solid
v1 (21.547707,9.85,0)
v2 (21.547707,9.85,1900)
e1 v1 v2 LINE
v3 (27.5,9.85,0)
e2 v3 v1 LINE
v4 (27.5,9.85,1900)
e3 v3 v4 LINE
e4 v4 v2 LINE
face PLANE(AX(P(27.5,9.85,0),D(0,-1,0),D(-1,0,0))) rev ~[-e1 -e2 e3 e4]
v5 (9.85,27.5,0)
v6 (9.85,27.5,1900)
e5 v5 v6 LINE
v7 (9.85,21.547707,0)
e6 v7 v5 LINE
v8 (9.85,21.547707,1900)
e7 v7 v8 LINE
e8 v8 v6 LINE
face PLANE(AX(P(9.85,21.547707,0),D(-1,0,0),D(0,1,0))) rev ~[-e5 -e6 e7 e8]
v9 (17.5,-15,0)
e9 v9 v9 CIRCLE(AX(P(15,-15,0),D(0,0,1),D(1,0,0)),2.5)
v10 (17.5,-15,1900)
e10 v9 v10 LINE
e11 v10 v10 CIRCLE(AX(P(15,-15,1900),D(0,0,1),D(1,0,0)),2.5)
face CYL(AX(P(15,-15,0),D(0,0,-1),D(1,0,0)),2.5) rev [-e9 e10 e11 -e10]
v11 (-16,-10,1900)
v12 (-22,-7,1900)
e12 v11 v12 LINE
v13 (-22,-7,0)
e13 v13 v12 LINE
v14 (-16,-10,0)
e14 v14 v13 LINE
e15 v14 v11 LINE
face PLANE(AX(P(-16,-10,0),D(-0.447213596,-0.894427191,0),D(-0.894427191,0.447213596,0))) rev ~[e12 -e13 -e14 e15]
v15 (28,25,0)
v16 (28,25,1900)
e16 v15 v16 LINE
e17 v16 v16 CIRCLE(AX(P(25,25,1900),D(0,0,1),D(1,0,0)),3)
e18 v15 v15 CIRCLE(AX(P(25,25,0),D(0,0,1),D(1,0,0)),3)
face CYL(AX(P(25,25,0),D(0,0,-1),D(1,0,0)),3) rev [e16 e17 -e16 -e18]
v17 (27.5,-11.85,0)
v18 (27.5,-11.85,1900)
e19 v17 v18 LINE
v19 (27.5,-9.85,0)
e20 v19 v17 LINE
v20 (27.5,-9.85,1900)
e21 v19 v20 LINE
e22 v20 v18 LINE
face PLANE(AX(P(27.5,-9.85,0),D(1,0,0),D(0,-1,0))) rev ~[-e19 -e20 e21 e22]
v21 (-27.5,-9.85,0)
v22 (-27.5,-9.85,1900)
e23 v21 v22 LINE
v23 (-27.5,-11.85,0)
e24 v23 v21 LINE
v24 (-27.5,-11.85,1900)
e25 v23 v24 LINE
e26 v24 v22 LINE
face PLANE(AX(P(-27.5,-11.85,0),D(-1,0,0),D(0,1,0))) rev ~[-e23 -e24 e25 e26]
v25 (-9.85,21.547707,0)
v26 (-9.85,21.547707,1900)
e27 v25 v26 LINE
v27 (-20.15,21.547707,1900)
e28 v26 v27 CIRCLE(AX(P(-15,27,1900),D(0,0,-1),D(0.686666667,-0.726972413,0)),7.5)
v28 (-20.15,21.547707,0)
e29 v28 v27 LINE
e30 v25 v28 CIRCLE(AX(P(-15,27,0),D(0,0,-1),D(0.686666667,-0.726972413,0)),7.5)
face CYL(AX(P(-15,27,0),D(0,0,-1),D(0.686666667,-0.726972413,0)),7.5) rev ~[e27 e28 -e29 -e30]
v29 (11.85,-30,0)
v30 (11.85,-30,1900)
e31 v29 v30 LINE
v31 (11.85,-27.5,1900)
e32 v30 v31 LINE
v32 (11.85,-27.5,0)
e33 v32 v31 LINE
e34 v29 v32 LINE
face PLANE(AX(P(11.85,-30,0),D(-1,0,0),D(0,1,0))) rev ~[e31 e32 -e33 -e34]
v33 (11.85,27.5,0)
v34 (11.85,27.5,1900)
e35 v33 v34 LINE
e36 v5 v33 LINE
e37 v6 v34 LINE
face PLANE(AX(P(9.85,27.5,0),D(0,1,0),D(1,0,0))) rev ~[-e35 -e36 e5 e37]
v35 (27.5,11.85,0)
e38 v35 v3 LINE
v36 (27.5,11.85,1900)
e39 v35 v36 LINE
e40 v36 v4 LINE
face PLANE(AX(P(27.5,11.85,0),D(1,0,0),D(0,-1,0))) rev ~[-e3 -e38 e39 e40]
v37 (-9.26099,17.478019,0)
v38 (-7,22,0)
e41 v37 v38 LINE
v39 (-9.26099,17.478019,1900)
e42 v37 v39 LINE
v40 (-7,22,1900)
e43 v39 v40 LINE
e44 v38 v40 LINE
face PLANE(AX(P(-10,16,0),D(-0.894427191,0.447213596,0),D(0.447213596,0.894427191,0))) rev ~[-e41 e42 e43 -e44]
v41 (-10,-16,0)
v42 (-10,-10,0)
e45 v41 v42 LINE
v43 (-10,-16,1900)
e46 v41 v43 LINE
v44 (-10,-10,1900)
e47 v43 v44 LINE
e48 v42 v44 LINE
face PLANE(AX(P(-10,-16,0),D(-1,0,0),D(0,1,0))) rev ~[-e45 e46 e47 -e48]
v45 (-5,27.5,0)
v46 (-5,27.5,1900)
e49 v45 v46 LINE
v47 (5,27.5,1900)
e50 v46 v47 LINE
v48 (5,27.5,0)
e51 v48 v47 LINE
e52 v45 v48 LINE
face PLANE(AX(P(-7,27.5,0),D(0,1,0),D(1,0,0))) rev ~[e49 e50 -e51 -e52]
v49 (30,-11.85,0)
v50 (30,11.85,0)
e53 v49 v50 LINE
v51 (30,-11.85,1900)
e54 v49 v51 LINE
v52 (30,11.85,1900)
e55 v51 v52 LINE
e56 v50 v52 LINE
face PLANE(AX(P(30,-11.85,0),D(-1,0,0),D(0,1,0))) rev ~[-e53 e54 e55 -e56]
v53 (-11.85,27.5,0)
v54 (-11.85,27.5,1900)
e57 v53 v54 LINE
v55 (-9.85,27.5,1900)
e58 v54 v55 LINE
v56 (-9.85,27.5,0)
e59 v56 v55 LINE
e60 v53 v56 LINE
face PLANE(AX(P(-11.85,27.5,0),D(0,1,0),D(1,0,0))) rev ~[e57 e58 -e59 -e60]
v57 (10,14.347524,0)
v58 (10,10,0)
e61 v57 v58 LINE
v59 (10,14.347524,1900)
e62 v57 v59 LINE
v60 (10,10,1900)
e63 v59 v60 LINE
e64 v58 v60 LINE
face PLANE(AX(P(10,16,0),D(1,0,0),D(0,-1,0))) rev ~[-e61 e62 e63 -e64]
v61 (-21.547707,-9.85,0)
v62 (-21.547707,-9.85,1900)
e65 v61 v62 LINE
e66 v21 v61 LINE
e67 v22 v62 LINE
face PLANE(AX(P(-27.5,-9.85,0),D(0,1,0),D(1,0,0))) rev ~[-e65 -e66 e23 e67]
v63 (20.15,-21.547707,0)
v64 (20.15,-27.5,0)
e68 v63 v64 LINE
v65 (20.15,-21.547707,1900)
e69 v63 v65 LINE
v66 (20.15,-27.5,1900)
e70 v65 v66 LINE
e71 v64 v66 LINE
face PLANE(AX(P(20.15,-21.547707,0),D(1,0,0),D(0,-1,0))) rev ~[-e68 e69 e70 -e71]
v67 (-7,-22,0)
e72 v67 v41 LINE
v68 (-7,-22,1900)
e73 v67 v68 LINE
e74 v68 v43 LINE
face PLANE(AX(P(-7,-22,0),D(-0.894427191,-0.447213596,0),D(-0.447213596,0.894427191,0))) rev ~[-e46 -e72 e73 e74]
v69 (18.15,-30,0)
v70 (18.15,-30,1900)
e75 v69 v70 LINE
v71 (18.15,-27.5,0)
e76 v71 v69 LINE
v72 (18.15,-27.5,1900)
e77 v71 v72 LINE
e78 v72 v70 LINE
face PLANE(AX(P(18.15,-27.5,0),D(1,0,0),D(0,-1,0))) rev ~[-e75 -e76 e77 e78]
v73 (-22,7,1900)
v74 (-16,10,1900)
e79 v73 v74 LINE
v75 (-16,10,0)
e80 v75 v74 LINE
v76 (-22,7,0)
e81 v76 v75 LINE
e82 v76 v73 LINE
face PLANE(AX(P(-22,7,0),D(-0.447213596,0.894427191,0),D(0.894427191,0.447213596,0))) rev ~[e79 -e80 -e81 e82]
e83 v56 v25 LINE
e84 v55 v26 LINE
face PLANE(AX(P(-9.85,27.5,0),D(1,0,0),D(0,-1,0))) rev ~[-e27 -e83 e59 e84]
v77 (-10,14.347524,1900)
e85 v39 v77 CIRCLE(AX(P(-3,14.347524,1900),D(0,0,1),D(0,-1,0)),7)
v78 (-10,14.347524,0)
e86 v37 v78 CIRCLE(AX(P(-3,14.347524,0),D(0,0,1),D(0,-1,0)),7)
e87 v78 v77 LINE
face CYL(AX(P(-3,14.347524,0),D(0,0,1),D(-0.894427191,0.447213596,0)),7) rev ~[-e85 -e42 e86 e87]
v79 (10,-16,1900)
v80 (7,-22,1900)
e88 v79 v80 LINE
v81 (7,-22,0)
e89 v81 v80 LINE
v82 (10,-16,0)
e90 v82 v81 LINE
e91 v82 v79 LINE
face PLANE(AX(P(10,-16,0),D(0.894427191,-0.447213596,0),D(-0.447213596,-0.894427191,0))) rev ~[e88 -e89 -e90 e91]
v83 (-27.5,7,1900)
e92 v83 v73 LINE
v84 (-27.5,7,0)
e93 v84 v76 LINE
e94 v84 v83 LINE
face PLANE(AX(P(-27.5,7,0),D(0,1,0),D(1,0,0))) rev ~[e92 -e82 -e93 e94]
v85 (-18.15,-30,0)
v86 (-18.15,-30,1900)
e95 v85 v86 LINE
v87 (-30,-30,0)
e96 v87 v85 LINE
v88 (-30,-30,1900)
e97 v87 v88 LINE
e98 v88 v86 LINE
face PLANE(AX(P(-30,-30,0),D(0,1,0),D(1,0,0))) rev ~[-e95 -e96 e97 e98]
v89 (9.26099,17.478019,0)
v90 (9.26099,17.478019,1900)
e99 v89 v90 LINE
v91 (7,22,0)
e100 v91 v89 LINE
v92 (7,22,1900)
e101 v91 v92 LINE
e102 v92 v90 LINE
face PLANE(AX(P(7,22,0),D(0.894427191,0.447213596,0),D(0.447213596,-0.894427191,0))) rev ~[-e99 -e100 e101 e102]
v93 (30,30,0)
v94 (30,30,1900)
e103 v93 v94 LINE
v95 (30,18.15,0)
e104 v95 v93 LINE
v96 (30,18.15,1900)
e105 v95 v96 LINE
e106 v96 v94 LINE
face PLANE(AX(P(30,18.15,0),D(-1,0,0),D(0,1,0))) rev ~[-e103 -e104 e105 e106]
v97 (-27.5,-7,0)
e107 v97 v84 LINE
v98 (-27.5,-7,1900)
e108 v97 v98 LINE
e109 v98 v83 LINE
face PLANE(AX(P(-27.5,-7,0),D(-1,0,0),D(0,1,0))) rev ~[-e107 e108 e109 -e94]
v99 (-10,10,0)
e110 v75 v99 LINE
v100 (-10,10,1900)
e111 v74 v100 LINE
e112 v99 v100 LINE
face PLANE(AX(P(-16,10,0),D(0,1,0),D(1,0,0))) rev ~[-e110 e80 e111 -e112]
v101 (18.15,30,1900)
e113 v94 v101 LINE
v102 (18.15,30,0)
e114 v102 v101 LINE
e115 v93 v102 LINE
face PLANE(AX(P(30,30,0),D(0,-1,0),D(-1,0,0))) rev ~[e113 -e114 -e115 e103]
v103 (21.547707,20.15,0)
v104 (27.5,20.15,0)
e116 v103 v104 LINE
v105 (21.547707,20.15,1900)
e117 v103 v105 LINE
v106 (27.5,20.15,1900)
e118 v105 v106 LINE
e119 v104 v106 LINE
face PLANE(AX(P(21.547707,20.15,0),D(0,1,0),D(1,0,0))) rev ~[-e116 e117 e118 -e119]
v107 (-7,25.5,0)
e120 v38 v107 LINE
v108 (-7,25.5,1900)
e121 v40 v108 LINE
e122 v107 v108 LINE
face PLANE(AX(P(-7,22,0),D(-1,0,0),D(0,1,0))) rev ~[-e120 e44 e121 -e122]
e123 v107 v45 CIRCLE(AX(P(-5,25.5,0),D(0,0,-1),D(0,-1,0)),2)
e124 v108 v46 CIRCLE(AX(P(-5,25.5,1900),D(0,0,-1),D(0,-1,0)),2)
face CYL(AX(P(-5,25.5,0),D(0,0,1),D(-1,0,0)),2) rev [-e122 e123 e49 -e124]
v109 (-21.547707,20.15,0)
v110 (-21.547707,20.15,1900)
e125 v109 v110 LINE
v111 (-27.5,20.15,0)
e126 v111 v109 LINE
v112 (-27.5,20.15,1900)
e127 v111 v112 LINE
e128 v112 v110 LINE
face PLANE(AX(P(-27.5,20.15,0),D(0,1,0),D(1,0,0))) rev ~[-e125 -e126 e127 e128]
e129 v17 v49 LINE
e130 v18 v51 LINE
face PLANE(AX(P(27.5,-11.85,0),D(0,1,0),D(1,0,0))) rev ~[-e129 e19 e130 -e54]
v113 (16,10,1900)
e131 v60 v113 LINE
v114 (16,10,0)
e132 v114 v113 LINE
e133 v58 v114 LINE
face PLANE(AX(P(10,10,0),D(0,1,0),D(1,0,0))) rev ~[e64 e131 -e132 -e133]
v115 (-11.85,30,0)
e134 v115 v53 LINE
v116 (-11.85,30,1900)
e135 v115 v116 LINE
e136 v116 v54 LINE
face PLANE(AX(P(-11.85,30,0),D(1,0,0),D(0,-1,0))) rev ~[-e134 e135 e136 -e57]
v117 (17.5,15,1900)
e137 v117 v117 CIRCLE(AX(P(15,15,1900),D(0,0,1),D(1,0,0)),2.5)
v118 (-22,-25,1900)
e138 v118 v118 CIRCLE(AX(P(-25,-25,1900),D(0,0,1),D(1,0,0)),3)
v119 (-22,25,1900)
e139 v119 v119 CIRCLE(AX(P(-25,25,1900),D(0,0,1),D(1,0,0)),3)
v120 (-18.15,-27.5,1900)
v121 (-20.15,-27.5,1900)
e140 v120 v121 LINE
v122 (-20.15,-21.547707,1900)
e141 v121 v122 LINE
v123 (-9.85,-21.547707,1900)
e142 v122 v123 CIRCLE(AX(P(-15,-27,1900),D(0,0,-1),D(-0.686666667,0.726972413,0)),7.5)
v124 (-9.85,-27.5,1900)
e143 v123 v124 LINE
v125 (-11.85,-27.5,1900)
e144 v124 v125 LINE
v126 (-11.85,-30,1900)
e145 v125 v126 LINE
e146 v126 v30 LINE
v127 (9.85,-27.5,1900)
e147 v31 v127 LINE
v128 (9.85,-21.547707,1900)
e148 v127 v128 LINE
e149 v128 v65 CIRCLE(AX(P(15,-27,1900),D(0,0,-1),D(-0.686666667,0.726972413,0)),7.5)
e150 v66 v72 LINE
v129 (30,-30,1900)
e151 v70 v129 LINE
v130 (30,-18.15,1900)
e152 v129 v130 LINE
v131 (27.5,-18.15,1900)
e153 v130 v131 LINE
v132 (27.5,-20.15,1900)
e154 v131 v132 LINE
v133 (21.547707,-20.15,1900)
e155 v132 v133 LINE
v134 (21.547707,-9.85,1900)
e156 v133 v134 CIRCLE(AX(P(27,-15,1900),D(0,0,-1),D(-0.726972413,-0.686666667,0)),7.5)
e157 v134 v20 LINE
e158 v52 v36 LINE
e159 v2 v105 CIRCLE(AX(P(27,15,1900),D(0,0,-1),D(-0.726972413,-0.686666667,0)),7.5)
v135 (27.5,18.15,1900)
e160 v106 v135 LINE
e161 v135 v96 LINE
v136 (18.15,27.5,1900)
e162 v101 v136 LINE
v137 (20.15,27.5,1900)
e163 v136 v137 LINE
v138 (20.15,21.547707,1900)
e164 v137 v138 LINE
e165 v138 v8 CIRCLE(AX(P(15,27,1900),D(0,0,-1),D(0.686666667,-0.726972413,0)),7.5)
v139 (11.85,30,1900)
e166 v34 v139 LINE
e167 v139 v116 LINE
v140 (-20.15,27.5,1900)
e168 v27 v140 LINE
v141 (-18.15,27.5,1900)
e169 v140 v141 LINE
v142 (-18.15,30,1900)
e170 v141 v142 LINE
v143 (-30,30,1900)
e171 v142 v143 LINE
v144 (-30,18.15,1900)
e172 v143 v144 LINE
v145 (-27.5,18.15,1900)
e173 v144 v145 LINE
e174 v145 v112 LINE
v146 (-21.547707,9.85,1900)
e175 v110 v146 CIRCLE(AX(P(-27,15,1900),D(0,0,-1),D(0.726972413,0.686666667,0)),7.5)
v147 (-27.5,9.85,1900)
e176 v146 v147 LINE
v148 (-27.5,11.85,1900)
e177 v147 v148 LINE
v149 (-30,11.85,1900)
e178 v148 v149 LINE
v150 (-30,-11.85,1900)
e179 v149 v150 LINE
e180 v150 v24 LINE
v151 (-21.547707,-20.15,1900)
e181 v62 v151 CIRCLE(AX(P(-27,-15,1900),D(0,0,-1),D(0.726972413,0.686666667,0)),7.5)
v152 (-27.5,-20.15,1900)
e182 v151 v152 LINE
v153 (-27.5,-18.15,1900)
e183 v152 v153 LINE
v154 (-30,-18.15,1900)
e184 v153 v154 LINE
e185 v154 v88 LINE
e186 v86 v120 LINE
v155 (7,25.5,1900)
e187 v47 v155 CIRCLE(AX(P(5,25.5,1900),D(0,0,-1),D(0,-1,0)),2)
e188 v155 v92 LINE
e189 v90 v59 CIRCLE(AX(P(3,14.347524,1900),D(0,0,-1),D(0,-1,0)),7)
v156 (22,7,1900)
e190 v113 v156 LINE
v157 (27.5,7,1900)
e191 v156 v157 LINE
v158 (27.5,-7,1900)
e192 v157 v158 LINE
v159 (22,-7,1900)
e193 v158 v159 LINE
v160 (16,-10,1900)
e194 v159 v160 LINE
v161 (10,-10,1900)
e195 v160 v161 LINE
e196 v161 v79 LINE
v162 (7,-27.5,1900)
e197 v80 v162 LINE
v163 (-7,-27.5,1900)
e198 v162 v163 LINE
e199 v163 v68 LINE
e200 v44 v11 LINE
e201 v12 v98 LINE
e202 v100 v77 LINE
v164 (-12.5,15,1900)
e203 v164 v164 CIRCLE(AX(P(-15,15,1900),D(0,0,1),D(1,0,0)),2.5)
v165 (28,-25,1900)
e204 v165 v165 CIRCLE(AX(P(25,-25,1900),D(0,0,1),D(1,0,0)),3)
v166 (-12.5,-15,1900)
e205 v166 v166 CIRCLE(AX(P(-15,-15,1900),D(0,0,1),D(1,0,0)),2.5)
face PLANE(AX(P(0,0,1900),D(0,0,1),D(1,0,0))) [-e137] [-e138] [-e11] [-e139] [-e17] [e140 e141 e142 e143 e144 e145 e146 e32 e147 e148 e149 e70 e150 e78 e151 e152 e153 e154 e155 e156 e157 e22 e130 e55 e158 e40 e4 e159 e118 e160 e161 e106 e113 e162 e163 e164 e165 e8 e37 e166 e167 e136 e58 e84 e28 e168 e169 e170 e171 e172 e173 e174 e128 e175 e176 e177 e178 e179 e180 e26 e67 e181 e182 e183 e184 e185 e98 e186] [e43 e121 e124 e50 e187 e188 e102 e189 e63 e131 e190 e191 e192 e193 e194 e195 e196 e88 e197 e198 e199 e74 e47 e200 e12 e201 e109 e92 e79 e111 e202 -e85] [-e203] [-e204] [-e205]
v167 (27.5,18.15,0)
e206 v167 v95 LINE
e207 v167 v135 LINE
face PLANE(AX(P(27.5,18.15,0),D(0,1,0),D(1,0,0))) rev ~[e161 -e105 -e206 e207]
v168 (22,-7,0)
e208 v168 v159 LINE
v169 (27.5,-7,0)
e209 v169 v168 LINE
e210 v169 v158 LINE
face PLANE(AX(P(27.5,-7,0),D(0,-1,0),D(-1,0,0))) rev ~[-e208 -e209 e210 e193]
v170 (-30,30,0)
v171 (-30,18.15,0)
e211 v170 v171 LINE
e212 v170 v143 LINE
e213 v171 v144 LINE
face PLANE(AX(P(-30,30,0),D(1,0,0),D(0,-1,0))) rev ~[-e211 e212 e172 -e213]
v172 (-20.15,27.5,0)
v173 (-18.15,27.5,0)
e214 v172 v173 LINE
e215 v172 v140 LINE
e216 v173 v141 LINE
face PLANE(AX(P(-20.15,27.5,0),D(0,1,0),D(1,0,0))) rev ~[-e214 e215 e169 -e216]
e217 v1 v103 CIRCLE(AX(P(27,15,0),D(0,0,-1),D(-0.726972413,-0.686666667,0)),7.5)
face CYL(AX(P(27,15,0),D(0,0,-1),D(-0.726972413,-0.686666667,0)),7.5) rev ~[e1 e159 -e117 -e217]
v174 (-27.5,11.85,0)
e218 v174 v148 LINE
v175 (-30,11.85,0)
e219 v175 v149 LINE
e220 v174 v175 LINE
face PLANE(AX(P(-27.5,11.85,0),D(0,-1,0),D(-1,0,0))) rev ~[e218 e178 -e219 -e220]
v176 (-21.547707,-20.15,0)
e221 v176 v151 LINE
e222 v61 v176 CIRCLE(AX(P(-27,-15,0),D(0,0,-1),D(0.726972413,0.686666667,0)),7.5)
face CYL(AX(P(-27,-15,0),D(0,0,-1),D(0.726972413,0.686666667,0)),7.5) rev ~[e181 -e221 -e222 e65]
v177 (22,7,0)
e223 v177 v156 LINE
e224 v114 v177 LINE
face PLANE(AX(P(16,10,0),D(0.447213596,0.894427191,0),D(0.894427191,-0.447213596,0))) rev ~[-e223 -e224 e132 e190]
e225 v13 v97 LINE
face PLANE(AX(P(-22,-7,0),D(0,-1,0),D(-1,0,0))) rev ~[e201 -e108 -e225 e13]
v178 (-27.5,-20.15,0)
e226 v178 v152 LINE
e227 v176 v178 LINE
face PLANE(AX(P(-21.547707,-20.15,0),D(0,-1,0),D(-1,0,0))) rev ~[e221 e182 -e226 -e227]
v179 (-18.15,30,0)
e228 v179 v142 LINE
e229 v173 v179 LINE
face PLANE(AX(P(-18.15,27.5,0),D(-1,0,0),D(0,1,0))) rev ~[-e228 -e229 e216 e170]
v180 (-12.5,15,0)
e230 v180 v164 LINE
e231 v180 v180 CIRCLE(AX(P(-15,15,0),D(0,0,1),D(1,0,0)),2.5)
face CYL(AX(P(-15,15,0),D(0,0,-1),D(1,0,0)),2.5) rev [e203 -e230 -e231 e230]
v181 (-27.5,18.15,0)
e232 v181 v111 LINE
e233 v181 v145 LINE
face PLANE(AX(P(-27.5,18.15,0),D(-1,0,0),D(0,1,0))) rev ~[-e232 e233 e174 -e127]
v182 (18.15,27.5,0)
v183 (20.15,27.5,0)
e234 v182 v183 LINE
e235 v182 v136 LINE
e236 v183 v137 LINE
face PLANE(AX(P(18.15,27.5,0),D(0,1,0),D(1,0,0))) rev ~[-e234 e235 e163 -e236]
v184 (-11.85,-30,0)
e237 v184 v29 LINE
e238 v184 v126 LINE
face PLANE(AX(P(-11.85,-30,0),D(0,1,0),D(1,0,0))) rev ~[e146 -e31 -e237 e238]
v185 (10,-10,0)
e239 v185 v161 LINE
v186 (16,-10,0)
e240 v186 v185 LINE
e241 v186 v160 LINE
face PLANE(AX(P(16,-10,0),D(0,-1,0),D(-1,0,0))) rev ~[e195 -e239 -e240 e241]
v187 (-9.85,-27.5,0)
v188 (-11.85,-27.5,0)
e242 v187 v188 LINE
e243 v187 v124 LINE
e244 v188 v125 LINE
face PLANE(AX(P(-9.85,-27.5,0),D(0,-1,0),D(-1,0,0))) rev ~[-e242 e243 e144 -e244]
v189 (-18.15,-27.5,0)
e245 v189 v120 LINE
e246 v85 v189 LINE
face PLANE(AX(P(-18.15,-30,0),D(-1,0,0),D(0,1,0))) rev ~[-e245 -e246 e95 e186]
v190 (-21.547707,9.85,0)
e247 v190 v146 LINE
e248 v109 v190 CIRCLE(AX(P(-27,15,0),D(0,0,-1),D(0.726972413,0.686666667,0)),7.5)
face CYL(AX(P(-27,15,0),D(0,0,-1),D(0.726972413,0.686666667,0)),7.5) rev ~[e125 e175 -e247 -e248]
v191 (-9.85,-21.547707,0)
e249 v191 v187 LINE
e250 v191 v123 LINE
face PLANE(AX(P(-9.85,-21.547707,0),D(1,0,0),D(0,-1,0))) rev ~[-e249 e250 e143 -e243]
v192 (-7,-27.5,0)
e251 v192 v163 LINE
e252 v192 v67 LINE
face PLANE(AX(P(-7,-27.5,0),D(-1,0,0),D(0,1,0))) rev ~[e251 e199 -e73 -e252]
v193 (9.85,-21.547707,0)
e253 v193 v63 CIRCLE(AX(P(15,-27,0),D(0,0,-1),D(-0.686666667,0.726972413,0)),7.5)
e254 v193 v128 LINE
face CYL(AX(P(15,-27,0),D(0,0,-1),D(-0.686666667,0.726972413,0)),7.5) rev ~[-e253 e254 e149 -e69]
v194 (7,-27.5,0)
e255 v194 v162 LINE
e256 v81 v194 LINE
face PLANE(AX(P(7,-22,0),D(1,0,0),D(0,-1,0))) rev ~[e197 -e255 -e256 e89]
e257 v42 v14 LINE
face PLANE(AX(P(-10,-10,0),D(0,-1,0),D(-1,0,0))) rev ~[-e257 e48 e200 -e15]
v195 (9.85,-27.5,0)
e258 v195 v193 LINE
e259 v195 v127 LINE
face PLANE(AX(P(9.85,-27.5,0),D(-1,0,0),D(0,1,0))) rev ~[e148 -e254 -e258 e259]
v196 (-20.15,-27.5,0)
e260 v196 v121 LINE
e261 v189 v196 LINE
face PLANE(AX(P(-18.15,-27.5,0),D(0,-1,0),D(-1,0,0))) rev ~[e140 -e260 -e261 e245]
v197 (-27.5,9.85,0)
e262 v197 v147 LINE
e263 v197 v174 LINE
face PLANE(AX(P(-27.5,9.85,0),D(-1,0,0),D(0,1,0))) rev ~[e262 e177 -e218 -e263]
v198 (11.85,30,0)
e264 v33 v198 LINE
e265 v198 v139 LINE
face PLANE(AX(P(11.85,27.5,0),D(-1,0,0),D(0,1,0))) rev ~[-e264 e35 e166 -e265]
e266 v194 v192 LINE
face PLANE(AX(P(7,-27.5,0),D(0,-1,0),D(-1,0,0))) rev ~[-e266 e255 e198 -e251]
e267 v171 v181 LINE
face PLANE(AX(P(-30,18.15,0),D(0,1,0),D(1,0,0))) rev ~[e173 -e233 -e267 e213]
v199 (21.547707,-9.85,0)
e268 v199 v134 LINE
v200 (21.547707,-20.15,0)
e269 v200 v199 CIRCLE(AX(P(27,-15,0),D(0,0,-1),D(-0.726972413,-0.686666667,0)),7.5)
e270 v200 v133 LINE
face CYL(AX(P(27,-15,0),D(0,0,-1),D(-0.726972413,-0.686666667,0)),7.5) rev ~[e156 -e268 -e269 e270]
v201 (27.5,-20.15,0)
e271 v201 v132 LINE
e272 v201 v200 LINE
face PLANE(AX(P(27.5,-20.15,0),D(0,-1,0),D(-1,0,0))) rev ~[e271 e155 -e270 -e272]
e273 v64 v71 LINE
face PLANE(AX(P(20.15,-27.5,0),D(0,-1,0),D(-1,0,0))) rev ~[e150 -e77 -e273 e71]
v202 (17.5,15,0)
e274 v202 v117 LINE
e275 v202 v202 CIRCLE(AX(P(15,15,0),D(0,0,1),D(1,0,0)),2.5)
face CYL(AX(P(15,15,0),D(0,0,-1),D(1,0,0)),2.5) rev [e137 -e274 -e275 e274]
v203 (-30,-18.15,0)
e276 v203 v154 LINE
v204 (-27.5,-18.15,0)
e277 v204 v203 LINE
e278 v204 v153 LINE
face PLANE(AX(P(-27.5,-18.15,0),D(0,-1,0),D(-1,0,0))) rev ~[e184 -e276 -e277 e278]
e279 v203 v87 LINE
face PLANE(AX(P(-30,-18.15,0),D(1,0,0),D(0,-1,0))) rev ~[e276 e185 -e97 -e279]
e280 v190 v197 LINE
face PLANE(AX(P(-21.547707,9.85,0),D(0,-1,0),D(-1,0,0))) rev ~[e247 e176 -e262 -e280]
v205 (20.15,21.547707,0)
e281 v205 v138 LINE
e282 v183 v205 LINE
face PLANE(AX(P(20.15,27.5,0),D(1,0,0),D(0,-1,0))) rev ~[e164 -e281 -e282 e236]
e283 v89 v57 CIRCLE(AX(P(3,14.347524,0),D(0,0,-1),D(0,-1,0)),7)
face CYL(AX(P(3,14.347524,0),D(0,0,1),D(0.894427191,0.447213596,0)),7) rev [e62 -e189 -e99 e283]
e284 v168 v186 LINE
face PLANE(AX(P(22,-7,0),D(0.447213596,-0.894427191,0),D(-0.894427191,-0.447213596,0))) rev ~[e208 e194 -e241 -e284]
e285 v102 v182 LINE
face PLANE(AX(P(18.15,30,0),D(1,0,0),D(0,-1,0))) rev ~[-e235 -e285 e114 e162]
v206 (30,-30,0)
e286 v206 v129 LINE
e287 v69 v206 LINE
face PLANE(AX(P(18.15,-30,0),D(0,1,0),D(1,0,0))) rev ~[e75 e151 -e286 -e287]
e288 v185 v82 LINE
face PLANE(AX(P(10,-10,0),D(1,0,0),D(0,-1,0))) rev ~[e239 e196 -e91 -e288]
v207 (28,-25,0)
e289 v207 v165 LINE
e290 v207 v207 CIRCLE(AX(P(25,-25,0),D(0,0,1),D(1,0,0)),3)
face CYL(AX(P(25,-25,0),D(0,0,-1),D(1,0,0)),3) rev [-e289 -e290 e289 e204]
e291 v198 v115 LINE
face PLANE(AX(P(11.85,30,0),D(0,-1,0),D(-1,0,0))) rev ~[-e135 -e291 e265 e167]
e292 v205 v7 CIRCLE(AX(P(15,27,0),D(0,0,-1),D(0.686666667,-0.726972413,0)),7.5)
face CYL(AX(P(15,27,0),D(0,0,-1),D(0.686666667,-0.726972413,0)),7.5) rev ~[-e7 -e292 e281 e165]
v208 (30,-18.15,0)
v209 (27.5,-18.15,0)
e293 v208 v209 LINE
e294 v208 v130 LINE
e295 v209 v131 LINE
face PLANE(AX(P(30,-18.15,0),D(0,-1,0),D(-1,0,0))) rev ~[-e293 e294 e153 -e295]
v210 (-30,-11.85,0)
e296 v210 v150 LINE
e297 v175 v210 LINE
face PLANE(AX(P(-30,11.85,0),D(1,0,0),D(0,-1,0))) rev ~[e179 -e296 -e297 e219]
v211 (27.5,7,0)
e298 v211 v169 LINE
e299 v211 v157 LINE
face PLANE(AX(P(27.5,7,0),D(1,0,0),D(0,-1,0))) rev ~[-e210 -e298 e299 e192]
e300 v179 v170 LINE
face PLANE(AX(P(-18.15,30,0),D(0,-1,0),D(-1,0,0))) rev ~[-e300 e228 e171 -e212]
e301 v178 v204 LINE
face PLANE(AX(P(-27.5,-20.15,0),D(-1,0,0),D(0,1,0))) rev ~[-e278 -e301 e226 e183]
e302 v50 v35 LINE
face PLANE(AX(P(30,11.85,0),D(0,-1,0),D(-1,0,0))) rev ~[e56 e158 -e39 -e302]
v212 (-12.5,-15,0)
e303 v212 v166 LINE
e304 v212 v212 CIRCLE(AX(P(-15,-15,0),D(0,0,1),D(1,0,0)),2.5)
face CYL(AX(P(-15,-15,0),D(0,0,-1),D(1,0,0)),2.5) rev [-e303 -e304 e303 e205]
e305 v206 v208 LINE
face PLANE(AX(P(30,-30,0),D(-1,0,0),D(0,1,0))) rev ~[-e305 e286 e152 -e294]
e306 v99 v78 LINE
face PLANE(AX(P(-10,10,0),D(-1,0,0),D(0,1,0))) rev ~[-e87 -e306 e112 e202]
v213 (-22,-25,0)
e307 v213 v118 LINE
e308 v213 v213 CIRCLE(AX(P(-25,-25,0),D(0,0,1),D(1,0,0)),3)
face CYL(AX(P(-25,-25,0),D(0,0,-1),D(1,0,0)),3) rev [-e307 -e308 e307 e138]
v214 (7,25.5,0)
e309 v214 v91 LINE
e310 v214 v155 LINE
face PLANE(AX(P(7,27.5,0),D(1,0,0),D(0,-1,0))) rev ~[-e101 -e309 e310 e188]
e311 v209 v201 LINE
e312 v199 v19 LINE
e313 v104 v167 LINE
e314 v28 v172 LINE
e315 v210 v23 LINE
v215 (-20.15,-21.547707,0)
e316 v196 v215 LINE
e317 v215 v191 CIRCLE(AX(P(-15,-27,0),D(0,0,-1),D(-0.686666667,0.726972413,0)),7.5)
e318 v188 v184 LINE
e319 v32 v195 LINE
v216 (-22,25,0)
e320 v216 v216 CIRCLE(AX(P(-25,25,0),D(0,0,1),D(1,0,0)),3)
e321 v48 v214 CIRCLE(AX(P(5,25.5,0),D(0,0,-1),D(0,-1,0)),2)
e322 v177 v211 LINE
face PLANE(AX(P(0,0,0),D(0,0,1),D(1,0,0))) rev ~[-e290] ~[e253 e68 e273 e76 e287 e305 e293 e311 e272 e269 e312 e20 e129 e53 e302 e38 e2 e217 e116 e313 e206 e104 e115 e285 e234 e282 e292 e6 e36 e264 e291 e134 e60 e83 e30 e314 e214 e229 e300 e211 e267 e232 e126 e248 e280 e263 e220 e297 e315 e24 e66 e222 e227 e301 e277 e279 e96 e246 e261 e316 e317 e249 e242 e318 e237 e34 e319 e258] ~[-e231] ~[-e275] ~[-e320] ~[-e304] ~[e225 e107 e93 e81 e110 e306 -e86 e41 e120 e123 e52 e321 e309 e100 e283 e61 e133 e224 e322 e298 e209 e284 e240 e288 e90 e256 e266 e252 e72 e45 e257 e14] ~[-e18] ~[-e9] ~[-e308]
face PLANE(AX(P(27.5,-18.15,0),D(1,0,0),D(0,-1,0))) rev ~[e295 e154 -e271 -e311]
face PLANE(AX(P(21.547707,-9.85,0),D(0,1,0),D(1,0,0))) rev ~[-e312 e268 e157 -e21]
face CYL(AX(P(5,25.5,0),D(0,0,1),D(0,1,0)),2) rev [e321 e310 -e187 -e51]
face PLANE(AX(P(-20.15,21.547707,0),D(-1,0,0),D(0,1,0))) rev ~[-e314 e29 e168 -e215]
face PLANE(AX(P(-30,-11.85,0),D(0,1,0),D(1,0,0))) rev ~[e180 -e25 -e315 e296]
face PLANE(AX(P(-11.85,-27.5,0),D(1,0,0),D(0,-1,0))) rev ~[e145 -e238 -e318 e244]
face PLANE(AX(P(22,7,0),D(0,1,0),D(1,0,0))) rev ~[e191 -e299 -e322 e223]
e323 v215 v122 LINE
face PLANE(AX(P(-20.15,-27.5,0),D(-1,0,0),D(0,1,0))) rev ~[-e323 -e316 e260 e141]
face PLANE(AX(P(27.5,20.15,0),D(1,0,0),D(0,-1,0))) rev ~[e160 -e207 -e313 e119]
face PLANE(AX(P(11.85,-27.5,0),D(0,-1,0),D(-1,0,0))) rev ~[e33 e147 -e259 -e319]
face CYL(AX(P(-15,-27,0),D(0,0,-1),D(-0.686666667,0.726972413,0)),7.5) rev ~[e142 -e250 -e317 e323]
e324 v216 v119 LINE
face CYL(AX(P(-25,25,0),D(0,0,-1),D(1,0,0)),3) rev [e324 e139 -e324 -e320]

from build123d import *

# Parameters (mm, degrees)
F0_R     = 3
F0_R_2   = 2.5
F1_DEPTH = 1900
F2_R     = 2
F3_R     = 7


# Not quite as in the source:
# - a feature names something its author has since deleted; it is built from what else it names


with BuildPart() as f1:
    # F0 (on Top) → F1 (new body)
    with BuildSketch(Plane.XY):
        with BuildLine():
            Line((18.15, -30), (30, -30))
            Line((30, -30), (30, -18.15))
            Line((30, -18.15), (27.5, -18.15))
            Line((27.5, -18.15), (27.5, -20.15))
            Line((27.5, -20.15), (21.5477069044, -20.15))
            ThreePointArc((21.5477069044, -20.15), (19.5, -15), (21.5477069044, -9.85))
            Line((21.5477069044, -9.85), (27.5, -9.85))
            Line((27.5, -9.85), (27.5, -11.85))
            Line((27.5, -11.85), (30, -11.85))
            Line((30, -11.85), (30, 11.85))
            Line((30, 11.85), (27.5, 11.85))
            Line((27.5, 11.85), (27.5, 9.85))
            Line((27.5, 9.85), (21.5477069044, 9.85))
            ThreePointArc((21.5477069044, 9.85), (19.5, 15), (21.5477069044, 20.15))
            Line((21.5477069044, 20.15), (27.5, 20.15))
            Line((27.5, 20.15), (27.5, 18.15))
            Line((27.5, 18.15), (30, 18.15))
            Line((30, 18.15), (30, 30))
            Line((30, 30), (18.15, 30))
            Line((18.15, 30), (18.15, 27.5))
            Line((18.15, 27.5), (20.15, 27.5))
            Line((20.15, 27.5), (20.15, 21.5477069044))
            ThreePointArc((20.15, 21.5477069044), (15, 19.5), (9.85, 21.5477069044))
            Line((9.85, 21.5477069044), (9.85, 27.5))
            Line((9.85, 27.5), (11.85, 27.5))
            Line((11.85, 27.5), (11.85, 30))
            Line((11.85, 30), (-11.85, 30))
            Line((-11.85, 30), (-11.85, 27.5))
            Line((-11.85, 27.5), (-9.85, 27.5))
            Line((-9.85, 27.5), (-9.85, 21.5477069044))
            ThreePointArc((-9.85, 21.5477069044), (-15, 19.5), (-20.15, 21.5477069044))
            Line((-20.15, 21.5477069044), (-20.15, 27.5))
            Line((-20.15, 27.5), (-18.15, 27.5))
            Line((-18.15, 27.5), (-18.15, 30))
            Line((-18.15, 30), (-30, 30))
            Line((-30, 30), (-30, 18.15))
            Line((-30, 18.15), (-27.5, 18.15))
            Line((-27.5, 18.15), (-27.5, 20.15))
            Line((-27.5, 20.15), (-21.5477069044, 20.15))
            ThreePointArc((-21.5477069044, 20.15), (-19.5, 15), (-21.5477069044, 9.85))
            Line((-21.5477069044, 9.85), (-27.5, 9.85))
            Line((-27.5, 9.85), (-27.5, 11.85))
            Line((-27.5, 11.85), (-30, 11.85))
            Line((-30, 11.85), (-30, -11.85))
            Line((-30, -11.85), (-27.5, -11.85))
            Line((-27.5, -11.85), (-27.5, -9.85))
            Line((-27.5, -9.85), (-21.5477069044, -9.85))
            ThreePointArc((-21.5477069044, -9.85), (-19.5, -15), (-21.5477069044, -20.15))
            Line((-21.5477069044, -20.15), (-27.5, -20.15))
            Line((-27.5, -20.15), (-27.5, -18.15))
            Line((-27.5, -18.15), (-30, -18.15))
            Line((-30, -18.15), (-30, -30))
            Line((-30, -30), (-18.15, -30))
            Line((-18.15, -30), (-18.15, -27.5))
            Line((-18.15, -27.5), (-20.15, -27.5))
            Line((-20.15, -27.5), (-20.15, -21.5477069044))
            ThreePointArc((-20.15, -21.5477069044), (-15, -19.5), (-9.85, -21.5477069044))
            Line((-9.85, -21.5477069044), (-9.85, -27.5))
            Line((-9.85, -27.5), (-11.85, -27.5))
            Line((-11.85, -27.5), (-11.85, -30))
            Line((-11.85, -30), (11.85, -30))
            Line((11.85, -30), (11.85, -27.5))
            Line((11.85, -27.5), (9.85, -27.5))
            Line((9.85, -27.5), (9.85, -21.5477069044))
            ThreePointArc((9.85, -21.5477069044), (15, -19.5), (20.15, -21.5477069044))
            Line((20.15, -21.5477069044), (20.15, -27.5))
            Line((20.15, -27.5), (18.15, -27.5))
            Line((18.15, -27.5), (18.15, -30))
        make_face()
        with Locations((-25, -25)):
            Circle(F0_R, mode=Mode.SUBTRACT)
        with Locations((-15, -15)):
            Circle(F0_R_2, mode=Mode.SUBTRACT)
        with Locations((25, -25)):
            Circle(F0_R, mode=Mode.SUBTRACT)
        with Locations((15, -15)):
            Circle(F0_R_2, mode=Mode.SUBTRACT)
        with Locations((-25, 25)):
            Circle(F0_R, mode=Mode.SUBTRACT)
        with Locations((-15, 15)):
            Circle(F0_R_2, mode=Mode.SUBTRACT)
        Polygon((-7, 22), (-7, 27.5), (0, 27.5), (7, 27.5), (7, 22), (10, 16), (10, 10), (16, 10), (22, 7), (27.5, 7), (27.5, 0), (27.5, -7), (22, -7), (16, -10), (10, -10), (10, -16), (7, -22), (7, -27.5), (0, -27.5), (-7, -27.5), (-7, -22), (-10, -16), (-10, -10), (-16, -10), (-22, -7), (-27.5, -7), (-27.5, 0), (-27.5, 7), (-22, 7), (-16, 10), (-10, 10), (-10, 16), align=None, mode=Mode.SUBTRACT)
        with Locations((15, 15)):
            Circle(F0_R_2, mode=Mode.SUBTRACT)
        with Locations((25, 25)):
            Circle(F0_R, mode=Mode.SUBTRACT)
    extrude(amount=F1_DEPTH)

    # F2
    f2_edges = [f1.edges().sort_by_distance(p)[0] for p in [
        (-7, 27.5, 950),
        (7, 27.5, 950),
    ]]
    fillet(f2_edges, radius=F2_R)

    # F3
    f3_edges = [f1.edges().sort_by_distance(p)[0] for p in [
        (-10, 16, 950),
        (10, 16, 950),
    ]]
    fillet(f3_edges, radius=F3_R)


solid = f1.part
